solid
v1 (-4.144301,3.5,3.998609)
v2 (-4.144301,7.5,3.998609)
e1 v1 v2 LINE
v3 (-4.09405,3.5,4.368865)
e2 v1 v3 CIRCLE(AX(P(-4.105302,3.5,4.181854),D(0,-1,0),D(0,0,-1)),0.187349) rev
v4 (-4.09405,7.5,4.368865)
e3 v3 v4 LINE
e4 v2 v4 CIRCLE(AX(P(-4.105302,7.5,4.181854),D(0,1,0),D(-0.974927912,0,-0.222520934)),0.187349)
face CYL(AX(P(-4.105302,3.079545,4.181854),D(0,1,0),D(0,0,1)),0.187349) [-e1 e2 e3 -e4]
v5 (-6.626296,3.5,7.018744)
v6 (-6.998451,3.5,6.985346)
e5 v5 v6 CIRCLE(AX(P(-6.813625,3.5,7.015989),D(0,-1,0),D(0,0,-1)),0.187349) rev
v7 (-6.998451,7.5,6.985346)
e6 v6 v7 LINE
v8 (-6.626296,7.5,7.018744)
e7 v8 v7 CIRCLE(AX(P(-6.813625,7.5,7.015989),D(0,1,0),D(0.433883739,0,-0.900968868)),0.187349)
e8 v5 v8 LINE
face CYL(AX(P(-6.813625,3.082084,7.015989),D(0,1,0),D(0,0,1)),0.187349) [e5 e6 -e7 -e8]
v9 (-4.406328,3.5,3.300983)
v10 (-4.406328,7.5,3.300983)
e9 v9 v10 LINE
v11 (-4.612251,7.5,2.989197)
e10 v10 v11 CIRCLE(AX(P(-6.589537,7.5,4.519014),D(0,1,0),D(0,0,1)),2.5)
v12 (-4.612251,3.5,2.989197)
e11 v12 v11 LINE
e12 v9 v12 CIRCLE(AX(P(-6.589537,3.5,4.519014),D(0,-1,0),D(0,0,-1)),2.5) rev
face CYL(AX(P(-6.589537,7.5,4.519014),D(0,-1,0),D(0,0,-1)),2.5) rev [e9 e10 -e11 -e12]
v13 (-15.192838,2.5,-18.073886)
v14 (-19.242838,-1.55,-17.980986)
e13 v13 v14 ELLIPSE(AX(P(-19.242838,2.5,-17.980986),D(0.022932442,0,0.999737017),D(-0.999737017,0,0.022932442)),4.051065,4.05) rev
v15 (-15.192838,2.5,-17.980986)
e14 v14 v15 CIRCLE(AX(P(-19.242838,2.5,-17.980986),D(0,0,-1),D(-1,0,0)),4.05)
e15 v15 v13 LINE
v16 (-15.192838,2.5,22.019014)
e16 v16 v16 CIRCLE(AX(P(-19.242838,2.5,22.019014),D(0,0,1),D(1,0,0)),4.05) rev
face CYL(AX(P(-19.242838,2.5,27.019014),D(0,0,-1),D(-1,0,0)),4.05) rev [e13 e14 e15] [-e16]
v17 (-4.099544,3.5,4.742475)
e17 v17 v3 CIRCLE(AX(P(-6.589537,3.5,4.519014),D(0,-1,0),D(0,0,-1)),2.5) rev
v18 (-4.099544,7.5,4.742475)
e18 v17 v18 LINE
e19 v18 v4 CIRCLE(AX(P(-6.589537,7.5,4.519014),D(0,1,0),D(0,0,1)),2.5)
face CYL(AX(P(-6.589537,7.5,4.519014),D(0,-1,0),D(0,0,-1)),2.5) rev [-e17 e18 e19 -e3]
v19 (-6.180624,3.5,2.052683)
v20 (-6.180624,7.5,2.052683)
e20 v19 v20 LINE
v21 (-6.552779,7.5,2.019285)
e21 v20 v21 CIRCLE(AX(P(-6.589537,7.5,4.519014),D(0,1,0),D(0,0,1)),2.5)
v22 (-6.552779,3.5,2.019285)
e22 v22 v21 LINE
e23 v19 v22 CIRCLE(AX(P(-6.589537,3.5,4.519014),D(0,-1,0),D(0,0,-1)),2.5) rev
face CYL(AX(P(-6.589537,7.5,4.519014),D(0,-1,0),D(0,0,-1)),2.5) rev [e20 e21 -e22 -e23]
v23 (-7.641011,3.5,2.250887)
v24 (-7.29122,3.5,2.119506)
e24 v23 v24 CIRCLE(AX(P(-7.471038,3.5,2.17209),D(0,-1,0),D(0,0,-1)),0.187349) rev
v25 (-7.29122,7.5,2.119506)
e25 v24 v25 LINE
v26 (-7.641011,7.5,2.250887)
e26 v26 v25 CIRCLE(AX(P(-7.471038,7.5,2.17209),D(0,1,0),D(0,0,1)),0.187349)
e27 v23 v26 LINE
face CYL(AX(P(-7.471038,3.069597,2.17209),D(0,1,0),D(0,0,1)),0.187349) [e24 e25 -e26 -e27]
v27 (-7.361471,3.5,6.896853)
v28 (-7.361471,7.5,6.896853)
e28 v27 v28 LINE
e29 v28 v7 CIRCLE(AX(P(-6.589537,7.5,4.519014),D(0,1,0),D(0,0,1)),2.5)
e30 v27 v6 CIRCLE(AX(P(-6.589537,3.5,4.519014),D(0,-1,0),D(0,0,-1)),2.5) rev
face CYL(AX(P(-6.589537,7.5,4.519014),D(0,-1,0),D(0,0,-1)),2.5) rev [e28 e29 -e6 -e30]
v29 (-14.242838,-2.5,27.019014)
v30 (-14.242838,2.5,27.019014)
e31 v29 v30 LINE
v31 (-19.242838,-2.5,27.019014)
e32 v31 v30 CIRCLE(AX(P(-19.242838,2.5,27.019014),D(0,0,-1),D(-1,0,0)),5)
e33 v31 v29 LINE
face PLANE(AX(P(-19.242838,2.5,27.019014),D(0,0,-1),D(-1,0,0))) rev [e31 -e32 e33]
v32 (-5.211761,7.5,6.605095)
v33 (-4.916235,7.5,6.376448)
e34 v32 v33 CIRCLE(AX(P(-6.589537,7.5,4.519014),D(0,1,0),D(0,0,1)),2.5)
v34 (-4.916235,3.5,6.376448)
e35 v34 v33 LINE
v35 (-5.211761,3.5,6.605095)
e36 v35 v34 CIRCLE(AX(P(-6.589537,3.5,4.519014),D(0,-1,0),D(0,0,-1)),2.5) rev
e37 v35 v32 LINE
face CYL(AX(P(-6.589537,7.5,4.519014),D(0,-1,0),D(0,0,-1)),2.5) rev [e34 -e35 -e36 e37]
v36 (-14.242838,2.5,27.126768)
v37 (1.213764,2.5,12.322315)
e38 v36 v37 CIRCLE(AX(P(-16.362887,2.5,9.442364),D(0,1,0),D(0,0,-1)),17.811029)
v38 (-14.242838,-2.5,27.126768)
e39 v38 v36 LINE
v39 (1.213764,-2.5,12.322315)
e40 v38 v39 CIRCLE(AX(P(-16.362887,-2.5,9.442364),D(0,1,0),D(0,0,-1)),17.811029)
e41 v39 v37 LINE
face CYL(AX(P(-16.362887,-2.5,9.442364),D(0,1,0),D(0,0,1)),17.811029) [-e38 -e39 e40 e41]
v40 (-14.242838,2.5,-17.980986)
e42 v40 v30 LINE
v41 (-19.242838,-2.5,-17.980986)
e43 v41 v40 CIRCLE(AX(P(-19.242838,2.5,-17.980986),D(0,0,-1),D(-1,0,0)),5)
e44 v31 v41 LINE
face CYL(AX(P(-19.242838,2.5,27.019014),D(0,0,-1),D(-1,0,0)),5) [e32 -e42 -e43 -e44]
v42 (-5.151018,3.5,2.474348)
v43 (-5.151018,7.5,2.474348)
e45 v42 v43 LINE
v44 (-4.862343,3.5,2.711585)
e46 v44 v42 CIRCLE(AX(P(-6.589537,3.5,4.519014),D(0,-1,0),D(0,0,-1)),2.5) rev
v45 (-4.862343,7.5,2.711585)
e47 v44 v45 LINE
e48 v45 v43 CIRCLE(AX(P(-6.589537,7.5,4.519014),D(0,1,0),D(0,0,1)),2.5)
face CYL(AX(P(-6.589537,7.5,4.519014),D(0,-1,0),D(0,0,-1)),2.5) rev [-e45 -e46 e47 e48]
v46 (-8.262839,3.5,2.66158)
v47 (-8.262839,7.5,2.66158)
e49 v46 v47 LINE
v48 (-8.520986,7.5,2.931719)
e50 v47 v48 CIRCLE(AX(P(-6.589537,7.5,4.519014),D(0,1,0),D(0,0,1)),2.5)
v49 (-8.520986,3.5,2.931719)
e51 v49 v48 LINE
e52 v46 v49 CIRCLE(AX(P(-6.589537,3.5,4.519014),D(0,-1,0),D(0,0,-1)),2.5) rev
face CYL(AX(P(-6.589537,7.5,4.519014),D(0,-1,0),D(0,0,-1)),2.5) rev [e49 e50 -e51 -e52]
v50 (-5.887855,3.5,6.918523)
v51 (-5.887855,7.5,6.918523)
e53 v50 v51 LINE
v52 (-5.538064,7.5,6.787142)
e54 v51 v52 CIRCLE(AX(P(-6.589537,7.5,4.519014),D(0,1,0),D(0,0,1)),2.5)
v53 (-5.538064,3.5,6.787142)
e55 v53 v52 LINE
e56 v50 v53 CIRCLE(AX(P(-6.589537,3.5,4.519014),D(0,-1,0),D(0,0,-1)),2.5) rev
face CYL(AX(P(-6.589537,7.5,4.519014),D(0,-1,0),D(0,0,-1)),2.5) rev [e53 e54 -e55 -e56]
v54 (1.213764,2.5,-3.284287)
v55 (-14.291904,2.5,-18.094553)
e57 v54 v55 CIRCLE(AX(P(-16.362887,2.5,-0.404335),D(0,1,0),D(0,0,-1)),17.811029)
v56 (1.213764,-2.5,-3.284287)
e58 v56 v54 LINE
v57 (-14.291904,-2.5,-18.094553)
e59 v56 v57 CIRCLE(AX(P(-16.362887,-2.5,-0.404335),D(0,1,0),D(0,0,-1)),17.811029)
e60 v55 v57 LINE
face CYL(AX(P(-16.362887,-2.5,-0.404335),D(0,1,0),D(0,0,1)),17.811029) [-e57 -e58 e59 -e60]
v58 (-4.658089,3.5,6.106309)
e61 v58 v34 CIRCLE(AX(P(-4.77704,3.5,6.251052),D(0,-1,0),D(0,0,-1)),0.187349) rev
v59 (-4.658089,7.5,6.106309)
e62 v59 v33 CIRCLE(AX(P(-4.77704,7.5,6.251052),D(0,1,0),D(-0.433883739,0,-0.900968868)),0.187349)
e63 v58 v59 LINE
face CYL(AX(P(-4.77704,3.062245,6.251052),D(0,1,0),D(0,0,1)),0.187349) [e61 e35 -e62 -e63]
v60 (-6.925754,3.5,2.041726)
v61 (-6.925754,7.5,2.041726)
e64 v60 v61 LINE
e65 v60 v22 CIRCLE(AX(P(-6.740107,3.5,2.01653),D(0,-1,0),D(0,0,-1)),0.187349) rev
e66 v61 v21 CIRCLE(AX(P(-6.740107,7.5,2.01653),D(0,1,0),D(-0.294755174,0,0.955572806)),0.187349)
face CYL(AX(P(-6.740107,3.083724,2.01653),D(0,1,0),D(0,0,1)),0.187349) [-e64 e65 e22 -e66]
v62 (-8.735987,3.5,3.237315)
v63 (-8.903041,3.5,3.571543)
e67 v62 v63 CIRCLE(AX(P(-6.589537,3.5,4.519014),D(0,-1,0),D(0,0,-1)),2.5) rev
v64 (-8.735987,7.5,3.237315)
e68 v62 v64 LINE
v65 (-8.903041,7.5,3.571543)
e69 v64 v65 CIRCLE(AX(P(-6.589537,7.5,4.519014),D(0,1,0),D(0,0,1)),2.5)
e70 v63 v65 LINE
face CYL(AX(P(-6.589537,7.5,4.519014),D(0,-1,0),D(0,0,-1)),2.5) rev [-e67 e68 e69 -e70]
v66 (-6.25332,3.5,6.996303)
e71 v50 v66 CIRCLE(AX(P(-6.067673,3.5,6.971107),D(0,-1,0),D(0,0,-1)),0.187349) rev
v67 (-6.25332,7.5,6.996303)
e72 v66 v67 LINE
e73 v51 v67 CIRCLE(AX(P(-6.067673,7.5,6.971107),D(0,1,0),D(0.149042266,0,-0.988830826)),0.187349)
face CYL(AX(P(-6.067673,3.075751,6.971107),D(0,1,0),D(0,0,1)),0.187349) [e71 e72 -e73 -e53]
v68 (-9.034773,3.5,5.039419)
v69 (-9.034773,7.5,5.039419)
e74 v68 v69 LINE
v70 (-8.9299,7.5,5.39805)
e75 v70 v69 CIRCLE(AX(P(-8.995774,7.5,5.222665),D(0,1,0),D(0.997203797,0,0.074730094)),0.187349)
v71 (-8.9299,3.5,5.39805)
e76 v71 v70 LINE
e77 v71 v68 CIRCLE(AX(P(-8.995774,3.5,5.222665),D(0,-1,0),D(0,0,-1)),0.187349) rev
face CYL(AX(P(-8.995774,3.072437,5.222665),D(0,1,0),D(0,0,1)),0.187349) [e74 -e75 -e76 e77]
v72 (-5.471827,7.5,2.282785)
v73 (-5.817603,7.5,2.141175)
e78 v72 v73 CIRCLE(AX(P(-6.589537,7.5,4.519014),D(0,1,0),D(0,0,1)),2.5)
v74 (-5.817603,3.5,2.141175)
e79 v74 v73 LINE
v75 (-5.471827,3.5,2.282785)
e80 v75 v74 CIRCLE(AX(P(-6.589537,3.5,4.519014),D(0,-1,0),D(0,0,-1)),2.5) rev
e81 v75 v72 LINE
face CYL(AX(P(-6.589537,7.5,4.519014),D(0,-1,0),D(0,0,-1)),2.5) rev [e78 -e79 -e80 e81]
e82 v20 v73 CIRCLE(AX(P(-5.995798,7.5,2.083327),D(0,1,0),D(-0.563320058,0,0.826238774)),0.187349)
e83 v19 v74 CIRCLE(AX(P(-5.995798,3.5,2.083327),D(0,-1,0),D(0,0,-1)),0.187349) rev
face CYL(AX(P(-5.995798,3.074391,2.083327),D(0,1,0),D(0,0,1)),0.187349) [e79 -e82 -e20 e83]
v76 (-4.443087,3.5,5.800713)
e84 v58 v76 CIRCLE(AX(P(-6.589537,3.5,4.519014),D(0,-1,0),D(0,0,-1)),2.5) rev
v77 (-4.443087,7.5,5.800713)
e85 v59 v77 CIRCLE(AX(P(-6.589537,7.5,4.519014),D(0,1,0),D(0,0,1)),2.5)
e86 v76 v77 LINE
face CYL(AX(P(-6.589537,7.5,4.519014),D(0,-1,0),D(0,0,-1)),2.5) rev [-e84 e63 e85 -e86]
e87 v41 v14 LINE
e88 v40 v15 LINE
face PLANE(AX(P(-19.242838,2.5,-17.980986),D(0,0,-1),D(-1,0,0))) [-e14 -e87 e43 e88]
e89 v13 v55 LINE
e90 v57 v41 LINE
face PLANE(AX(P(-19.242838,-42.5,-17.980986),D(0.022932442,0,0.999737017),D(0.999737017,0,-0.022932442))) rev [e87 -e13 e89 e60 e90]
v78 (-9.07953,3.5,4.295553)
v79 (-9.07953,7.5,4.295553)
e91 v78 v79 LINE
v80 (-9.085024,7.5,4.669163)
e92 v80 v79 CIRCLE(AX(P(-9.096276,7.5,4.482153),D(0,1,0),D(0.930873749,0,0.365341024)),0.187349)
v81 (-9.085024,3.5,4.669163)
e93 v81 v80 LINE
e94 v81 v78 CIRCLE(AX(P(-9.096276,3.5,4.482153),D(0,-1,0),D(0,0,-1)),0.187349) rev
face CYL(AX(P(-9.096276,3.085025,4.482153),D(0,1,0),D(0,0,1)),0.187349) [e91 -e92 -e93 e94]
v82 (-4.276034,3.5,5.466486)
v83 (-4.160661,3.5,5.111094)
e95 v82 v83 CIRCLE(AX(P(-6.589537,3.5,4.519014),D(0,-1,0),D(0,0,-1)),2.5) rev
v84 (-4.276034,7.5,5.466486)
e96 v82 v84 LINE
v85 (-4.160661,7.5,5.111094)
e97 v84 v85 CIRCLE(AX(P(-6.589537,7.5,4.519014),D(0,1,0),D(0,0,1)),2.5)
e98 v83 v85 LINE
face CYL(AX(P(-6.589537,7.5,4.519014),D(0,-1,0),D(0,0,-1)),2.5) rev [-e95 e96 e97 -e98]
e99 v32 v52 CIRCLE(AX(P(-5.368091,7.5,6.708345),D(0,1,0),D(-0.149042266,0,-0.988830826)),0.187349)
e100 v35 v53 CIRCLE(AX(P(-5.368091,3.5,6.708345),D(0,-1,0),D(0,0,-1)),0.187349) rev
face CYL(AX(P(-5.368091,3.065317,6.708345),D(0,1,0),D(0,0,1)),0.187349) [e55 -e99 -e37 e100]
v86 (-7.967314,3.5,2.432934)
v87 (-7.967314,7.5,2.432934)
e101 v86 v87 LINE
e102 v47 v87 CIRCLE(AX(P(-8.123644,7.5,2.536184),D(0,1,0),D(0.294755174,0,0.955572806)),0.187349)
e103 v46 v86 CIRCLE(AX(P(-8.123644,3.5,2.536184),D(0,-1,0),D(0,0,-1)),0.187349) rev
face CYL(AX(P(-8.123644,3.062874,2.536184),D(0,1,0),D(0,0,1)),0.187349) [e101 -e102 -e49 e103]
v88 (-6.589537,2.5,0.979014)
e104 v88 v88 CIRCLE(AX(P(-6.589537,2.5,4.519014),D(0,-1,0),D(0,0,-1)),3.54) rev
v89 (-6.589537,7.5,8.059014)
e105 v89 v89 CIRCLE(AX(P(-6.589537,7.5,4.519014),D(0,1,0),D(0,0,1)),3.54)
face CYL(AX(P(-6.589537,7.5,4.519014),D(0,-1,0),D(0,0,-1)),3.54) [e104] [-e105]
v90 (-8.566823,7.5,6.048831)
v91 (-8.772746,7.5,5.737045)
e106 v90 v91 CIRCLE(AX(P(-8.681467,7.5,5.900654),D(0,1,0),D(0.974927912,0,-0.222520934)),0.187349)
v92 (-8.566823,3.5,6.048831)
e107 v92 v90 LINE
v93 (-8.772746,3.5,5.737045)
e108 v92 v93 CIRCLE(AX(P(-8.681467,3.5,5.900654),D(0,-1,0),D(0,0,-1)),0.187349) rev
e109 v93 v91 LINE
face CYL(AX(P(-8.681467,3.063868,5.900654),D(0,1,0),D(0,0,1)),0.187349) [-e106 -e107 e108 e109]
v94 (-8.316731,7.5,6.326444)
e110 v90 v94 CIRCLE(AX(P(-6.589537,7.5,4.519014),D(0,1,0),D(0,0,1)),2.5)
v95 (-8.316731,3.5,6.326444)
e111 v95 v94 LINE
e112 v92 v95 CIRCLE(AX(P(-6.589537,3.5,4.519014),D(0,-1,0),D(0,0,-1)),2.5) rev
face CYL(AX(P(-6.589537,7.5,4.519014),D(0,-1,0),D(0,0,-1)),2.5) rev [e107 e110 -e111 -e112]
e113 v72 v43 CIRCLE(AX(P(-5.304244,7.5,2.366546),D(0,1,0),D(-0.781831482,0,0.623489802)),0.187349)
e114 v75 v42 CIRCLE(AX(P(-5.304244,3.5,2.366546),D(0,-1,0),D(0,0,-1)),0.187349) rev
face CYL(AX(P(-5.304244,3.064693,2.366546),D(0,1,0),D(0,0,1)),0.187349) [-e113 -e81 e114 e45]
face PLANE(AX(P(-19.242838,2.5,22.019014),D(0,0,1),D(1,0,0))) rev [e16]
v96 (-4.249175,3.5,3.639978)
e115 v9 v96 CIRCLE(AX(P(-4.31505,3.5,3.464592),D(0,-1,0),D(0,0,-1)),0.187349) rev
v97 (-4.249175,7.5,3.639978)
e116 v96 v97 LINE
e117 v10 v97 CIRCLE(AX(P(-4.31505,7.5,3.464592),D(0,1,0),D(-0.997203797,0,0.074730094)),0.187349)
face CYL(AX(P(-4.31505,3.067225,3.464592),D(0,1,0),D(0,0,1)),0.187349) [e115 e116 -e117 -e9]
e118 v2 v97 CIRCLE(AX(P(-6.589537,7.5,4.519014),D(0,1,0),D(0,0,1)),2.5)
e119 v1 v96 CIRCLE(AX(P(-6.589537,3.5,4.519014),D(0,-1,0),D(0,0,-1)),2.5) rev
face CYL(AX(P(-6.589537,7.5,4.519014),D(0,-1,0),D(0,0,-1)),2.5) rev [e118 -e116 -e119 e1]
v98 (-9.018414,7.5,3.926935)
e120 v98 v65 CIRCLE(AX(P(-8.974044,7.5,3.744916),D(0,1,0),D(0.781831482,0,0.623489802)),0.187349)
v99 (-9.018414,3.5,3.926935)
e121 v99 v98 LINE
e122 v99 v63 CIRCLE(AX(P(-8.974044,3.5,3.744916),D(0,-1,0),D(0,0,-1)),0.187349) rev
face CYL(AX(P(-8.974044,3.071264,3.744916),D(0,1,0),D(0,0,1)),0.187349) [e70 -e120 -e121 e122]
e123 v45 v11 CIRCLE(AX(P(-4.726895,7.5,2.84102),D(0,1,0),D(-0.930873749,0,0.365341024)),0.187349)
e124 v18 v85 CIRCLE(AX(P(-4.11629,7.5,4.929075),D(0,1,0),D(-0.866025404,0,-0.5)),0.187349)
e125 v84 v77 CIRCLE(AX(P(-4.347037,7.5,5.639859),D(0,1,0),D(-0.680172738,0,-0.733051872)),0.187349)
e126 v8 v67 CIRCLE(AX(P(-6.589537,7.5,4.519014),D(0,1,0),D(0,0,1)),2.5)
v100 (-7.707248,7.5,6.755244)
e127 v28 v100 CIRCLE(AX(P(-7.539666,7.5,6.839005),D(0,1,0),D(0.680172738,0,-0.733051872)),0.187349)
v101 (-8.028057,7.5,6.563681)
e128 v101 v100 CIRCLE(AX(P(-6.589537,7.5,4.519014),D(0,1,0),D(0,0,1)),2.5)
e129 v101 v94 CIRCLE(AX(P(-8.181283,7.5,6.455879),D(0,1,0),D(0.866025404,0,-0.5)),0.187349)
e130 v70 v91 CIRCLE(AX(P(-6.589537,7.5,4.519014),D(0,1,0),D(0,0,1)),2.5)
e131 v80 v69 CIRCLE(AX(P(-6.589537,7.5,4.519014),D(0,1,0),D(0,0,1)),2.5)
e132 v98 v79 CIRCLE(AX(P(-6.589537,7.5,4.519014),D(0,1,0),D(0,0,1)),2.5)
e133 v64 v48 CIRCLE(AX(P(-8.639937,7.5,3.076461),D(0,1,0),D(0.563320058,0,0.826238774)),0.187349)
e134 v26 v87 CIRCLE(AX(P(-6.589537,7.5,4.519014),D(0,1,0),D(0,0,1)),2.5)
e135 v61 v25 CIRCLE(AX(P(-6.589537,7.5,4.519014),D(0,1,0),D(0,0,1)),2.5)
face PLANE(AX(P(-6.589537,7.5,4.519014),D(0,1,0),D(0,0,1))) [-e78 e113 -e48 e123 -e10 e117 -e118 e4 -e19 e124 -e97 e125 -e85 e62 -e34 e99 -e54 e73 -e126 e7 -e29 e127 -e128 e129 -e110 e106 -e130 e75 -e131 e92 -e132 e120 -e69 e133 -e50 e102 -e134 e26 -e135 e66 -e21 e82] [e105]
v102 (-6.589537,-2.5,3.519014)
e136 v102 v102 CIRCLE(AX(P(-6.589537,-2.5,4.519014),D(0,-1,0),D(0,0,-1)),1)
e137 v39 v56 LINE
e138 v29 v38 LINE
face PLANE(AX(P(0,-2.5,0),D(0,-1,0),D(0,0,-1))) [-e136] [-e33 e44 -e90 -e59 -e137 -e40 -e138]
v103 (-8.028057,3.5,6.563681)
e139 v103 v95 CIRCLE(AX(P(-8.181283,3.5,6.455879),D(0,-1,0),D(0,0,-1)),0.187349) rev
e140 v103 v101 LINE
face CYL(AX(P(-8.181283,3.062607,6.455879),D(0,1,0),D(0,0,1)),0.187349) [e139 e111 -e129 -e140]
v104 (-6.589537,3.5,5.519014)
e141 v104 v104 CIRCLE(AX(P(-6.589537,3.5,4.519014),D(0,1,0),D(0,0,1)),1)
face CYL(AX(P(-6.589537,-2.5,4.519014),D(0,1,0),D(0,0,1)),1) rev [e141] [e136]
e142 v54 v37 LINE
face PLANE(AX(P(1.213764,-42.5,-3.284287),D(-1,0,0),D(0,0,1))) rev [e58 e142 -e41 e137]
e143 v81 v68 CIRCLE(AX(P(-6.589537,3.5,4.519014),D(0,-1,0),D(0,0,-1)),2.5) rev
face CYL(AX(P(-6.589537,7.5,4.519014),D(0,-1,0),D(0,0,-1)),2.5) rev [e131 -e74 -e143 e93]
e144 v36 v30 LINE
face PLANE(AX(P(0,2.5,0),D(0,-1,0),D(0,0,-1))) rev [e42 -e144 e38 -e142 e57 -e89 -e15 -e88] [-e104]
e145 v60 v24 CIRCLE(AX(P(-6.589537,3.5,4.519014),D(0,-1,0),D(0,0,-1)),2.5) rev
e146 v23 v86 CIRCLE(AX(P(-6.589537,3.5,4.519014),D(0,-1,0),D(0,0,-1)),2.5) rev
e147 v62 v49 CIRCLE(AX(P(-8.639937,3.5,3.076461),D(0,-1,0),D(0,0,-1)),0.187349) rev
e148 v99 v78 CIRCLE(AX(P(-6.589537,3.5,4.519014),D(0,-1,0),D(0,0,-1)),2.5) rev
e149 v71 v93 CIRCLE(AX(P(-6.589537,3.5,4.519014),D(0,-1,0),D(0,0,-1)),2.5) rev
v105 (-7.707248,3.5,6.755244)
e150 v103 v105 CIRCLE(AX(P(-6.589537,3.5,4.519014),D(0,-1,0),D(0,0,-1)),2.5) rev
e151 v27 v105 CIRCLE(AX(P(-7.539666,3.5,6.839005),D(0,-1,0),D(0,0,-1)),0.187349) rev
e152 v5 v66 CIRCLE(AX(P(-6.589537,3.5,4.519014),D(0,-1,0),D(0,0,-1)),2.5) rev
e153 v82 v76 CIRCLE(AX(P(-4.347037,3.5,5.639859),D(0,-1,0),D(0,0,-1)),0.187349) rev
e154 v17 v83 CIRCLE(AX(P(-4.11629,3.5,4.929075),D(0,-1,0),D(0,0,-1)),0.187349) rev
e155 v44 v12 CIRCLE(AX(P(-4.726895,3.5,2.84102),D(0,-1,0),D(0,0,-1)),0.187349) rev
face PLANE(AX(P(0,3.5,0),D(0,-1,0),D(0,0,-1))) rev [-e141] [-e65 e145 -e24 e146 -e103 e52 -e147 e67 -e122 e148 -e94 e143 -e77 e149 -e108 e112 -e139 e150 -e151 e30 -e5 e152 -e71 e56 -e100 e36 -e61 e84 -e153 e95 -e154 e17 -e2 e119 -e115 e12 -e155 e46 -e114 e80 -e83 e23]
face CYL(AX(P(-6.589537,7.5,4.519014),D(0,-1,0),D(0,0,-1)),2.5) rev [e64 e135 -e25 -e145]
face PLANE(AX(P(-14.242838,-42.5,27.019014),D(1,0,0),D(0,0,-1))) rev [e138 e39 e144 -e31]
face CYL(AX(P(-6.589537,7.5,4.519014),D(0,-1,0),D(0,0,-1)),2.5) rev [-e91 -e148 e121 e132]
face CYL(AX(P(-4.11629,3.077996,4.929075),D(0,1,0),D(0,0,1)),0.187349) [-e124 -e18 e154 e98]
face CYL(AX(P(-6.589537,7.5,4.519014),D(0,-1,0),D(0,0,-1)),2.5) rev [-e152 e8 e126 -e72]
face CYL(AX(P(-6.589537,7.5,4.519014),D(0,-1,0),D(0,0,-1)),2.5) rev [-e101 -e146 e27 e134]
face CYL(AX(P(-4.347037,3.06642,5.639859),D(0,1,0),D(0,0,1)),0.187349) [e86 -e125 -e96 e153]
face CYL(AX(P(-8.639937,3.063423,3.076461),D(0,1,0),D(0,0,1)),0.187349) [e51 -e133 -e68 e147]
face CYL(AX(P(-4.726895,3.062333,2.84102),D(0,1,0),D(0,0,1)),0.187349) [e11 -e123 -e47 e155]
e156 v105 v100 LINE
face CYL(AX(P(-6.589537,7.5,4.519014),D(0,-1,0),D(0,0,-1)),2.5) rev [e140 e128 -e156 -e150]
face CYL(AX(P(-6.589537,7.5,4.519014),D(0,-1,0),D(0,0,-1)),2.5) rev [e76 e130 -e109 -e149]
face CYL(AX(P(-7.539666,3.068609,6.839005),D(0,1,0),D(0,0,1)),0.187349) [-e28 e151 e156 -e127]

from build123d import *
from build123d.topology import SkipClean

# Parameters (mm, degrees)
BOSS_EXTRUDE7_DEPTH      = 2.5
BOSS_EXTRUDE7_DEPTH_BACK = 2.5
SKETCH1_R                = 1
SKETCH3_W                = 5
SKETCH3_H                = 5
SKETCH3_R                = 1
BOSS_EXTRUDE9_DEPTH      = 1
FILLET2_R                = 2.5
SKETCH4_R                = 3.54
SKETCH4_R_2              = 2.5
BOSS_EXTRUDE11_DEPTH     = 5
BOSS_EXTRUDE13_START     = -4
BOSS_EXTRUDE13_DEPTH     = 4
CIRPATTERN2_COUNT        = 21
SKETCH18_R               = 5
SKETCH18_R_2             = 4.05
BOSS_EXTRUDE24_DEPTH     = 45
SKETCH19_R               = 4.05
CUT_EXTRUDE2_DEPTH       = 55.105925545
BOSS_EXTRUDE25_START     = -5
SKETCH20_R               = 5
BOSS_EXTRUDE25_DEPTH     = 5
CUT_EXTRUDE4_DEPTH       = 45
BOSS_EXTRUDE35_DEPTH     = 5
SKETCH28_W               = 5
SKETCH28_H               = 1.900081374
CUT_EXTRUDE9_DEPTH       = 45
CUT_EXTRUDE10_DEPTH      = 45
CUT_EXTRUDE12_DEPTH      = 40
CUT_EXTRUDE12_DEPTH_BACK = 40
SKETCH32_R               = 4.05
CUT_EXTRUDE13_START      = -40
SKETCH33_R               = 1
CUT_EXTRUDE13_DEPTH      = 40


with BuildPart() as part:
    # Sketch1 → Boss-Extrude7 (new, two sides: drawn at the far end of the back side and taken through both)
    with BuildSketch(Plane(origin=(0, 0, 0), x_dir=(1, 0, 0), z_dir=(0, 1, 0)).offset(-BOSS_EXTRUDE7_DEPTH_BACK)):
        Polygon((-29.089537279, -2.019014343), (-29.089537279, -7.019014343), (-14.392838138, -12.322315202), (-9.089537279, -27.019014343), (-4.089537279, -27.019014343), (1.21376358, -12.322315202), (15.910462721, -7.019014343), (15.910462721, -2.019014343), (1.21376358, 3.284286516), (-4.089537279, 17.980985657), (-9.089537279, 17.980985657), (-14.392838138, 3.284286516), align=None)
        with Locations(Location((-6.589537279, -4.519014343, 0), (0, 0, 270))):
            Circle(SKETCH1_R, mode=Mode.SUBTRACT)
    extrude(amount=BOSS_EXTRUDE7_DEPTH + BOSS_EXTRUDE7_DEPTH_BACK)

    # Sketch3 → Boss-Extrude9 (add)
    with BuildSketch(Plane(origin=(0, 2.5, 0), x_dir=(1, 0, 0), z_dir=(0, 1, 0))):
        with Locations((-6.589537279, -4.519014343)):
            Rectangle(SKETCH3_W, SKETCH3_H)
        with Locations(Location((-6.589537279, -4.519014343, 0), (0, 0, 270))):
            Circle(SKETCH3_R, mode=Mode.SUBTRACT)
    extrude(amount=BOSS_EXTRUDE9_DEPTH)

    # Fillet2
    fillet2_edges = [part.edges().sort_by_distance(p)[0] for p in [
        (-4.089537279, 3, 7.019014343),
        (-4.089537279, 3, 2.019014343),
        (-9.089537279, 3, 7.019014343),
        (-9.089537279, 3, 2.019014343),
    ]]
    fillet(fillet2_edges, radius=FILLET2_R - 0.0001)  # a hair under: the kernel refuses the full size

    # Sketch4 → Boss-Extrude11 (add)
    with BuildSketch(Plane(origin=(0, 2.5, 0), x_dir=(1, 0, 0), z_dir=(0, 1, 0))):
        with Locations(Location((-6.589537279, -4.519014343, 0), (0, 0, 90))):
            Circle(SKETCH4_R)
        with Locations(Location((-6.589537279, -4.519014343, 0), (0, 0, 90))):
            Circle(SKETCH4_R_2, mode=Mode.SUBTRACT)
    extrude(amount=BOSS_EXTRUDE11_DEPTH)

    # Sketch8 → Boss-Extrude13 (add)
    with BuildSketch(Plane(origin=(0, 7.5, 0), x_dir=(1, 0, 0), z_dir=(0, 1, 0)).offset(BOSS_EXTRUDE13_START)):
        with BuildLine():
            ThreePointArc((-7.641010895, -2.250886649), (-7.405163574, -2.347475501), (-7.291219912, -2.119505751))
            ThreePointArc((-7.291219912, -2.119505751), (-7.468573367, -2.178652072), (-7.641010895, -2.250886649))
        make_face()
    boss_extrude13 = extrude(amount=BOSS_EXTRUDE13_DEPTH)

    # CirPattern2: Boss-Extrude13 ×21 about axis
    cirpattern2_axis = Axis((-6.589537279, 0, 4.519014343), (0, 1, 0))
    for i in range(1, CIRPATTERN2_COUNT):
        add(boss_extrude13.rotate(cirpattern2_axis, i * 360 / CIRPATTERN2_COUNT))

    # Sketch18 → Boss-Extrude24 (add)
    with BuildSketch(Plane(origin=(0, 0, -17.980985657), x_dir=(-1, 0, 0), z_dir=(0, 0, -1))):
        with Locations((19.242838138, 2.5)):
            Circle(SKETCH18_R)
        with Locations((19.242838138, 2.5)):
            Circle(SKETCH18_R_2, mode=Mode.SUBTRACT)
    extrude(amount=-BOSS_EXTRUDE24_DEPTH)

    # Sketch19 → Cut-Extrude2 (cut, through all)
    with BuildSketch(Plane(origin=(0, 0, -17.980985657), x_dir=(-1, 0, 0), z_dir=(0, 0, -1))):
        with Locations((19.242838138, 2.5)):
            Circle(SKETCH19_R)
    extrude(amount=-CUT_EXTRUDE2_DEPTH, mode=Mode.SUBTRACT)

    # Sketch20 → Boss-Extrude25 (add)
    with BuildSketch(Plane.XY.offset(27.019014343).offset(BOSS_EXTRUDE25_START)):
        with Locations(Location((-19.242838138, 2.5, 0), (0, 0, 180))):
            Circle(SKETCH20_R)
    extrude(amount=BOSS_EXTRUDE25_DEPTH)

    # Sketch24 → Cut-Extrude4 (cut)
    with SkipClean():  # the faces are left unmerged after this step: merging them gives an invalid solid
        with BuildSketch(Plane(origin=(0, 0, -17.980985657), x_dir=(-1, 0, 0), z_dir=(0, 0, -1))):
            with BuildLine():
                Line((19.242838138, -2.5), (29.239649505, -2.5))
                Line((29.239649505, -2.5), (29.239649505, 2.5))
                Line((29.239649505, 2.5), (24.242838138, 2.5))
                ThreePointArc((24.242838138, 2.5), (22.778372044, -1.035533906), (19.242838138, -2.5))
            make_face()
        extrude(amount=-CUT_EXTRUDE4_DEPTH, mode=Mode.SUBTRACT)

    # Sketch26 → Boss-Extrude35 (add)
    with BuildSketch(Plane(origin=(0, 2.5, 0), x_dir=(1, 0, 0), z_dir=(0, 1, 0))):
        with BuildLine():
            Line((1.21376358, 3.284286516), (1.21376358, -12.322315202))
            ThreePointArc((1.21376358, -12.322315202), (-5.970751226, -23.907365708), (-19.242838138, -27.019014343))
            Line((-19.242838138, -27.019014343), (-19.242838138, 17.980985657))
            ThreePointArc((-19.242838138, 17.980985657), (-5.970751226, 14.869337023), (1.21376358, 3.284286516))
        make_face()
    extrude(amount=-BOSS_EXTRUDE35_DEPTH)

    # Sketch28 → Cut-Extrude9 (cut)
    with BuildSketch(Plane(origin=(0, 2.5, 0), x_dir=(1, 0, 0), z_dir=(0, 1, 0))):
        Polygon((-19.242838138, 17.980985657), (-14.291903713, 18.094552541), (-14.291903713, 20.179520428), (-19.242838138, 20.179520428), align=None)
        with Locations((-16.742838138, -27.96905503)):
            Rectangle(SKETCH28_W, SKETCH28_H)
    extrude(amount=-CUT_EXTRUDE9_DEPTH, mode=Mode.SUBTRACT)

    # Sketch30 → Cut-Extrude10 (cut)
    with BuildSketch(Plane(origin=(0, 2.5, 0), x_dir=(1, 0, 0), z_dir=(0, 1, 0))):
        with BuildLine():
            Line((1.21376358, 3.284286516), (1.21376358, -12.322315202))
            ThreePointArc((1.21376358, -12.322315202), (-5.970751226, -23.907365708), (-19.242838138, -27.019014343))
            Line((-19.242838138, -27.019014343), (-19.242838138, -29.875538086))
            Line((-19.242838138, -29.875538086), (19.285813169, -29.875538086))
            Line((19.285813169, -29.875538086), (19.285813169, 19.780165104))
            Line((19.285813169, 19.780165104), (-19.242838138, 19.780165104))
            Line((-19.242838138, 19.780165104), (-19.242838138, 17.980985657))
            ThreePointArc((-19.242838138, 17.980985657), (-5.970751226, 14.869337023), (1.21376358, 3.284286516))
        make_face()
    extrude(amount=-CUT_EXTRUDE10_DEPTH, mode=Mode.SUBTRACT)

    # Sketch32 → Cut-Extrude12 (cut, two sides: drawn at the far end of the back side and taken through both)
    with BuildSketch(Plane(origin=(0, 0, -17.980985657), x_dir=(-1, 0, 0), z_dir=(0, 0, -1)).offset(-CUT_EXTRUDE12_DEPTH_BACK)):
        with Locations(Location((19.242838138, 2.5, 0), (0, 0, 180))):
            Circle(SKETCH32_R)
    extrude(amount=CUT_EXTRUDE12_DEPTH + CUT_EXTRUDE12_DEPTH_BACK, mode=Mode.SUBTRACT)

    # Sketch33 → Cut-Extrude13 (cut)
    with BuildSketch(Plane(origin=(0, 2.5, 0), x_dir=(1, 0, 0), z_dir=(0, 1, 0)).offset(CUT_EXTRUDE13_START)):
        with Locations(Location((-6.589537279, -4.519014343, 0), (0, 0, 270))):
            Circle(SKETCH33_R)
    extrude(amount=CUT_EXTRUDE13_DEPTH, mode=Mode.SUBTRACT)


solid = part.part
